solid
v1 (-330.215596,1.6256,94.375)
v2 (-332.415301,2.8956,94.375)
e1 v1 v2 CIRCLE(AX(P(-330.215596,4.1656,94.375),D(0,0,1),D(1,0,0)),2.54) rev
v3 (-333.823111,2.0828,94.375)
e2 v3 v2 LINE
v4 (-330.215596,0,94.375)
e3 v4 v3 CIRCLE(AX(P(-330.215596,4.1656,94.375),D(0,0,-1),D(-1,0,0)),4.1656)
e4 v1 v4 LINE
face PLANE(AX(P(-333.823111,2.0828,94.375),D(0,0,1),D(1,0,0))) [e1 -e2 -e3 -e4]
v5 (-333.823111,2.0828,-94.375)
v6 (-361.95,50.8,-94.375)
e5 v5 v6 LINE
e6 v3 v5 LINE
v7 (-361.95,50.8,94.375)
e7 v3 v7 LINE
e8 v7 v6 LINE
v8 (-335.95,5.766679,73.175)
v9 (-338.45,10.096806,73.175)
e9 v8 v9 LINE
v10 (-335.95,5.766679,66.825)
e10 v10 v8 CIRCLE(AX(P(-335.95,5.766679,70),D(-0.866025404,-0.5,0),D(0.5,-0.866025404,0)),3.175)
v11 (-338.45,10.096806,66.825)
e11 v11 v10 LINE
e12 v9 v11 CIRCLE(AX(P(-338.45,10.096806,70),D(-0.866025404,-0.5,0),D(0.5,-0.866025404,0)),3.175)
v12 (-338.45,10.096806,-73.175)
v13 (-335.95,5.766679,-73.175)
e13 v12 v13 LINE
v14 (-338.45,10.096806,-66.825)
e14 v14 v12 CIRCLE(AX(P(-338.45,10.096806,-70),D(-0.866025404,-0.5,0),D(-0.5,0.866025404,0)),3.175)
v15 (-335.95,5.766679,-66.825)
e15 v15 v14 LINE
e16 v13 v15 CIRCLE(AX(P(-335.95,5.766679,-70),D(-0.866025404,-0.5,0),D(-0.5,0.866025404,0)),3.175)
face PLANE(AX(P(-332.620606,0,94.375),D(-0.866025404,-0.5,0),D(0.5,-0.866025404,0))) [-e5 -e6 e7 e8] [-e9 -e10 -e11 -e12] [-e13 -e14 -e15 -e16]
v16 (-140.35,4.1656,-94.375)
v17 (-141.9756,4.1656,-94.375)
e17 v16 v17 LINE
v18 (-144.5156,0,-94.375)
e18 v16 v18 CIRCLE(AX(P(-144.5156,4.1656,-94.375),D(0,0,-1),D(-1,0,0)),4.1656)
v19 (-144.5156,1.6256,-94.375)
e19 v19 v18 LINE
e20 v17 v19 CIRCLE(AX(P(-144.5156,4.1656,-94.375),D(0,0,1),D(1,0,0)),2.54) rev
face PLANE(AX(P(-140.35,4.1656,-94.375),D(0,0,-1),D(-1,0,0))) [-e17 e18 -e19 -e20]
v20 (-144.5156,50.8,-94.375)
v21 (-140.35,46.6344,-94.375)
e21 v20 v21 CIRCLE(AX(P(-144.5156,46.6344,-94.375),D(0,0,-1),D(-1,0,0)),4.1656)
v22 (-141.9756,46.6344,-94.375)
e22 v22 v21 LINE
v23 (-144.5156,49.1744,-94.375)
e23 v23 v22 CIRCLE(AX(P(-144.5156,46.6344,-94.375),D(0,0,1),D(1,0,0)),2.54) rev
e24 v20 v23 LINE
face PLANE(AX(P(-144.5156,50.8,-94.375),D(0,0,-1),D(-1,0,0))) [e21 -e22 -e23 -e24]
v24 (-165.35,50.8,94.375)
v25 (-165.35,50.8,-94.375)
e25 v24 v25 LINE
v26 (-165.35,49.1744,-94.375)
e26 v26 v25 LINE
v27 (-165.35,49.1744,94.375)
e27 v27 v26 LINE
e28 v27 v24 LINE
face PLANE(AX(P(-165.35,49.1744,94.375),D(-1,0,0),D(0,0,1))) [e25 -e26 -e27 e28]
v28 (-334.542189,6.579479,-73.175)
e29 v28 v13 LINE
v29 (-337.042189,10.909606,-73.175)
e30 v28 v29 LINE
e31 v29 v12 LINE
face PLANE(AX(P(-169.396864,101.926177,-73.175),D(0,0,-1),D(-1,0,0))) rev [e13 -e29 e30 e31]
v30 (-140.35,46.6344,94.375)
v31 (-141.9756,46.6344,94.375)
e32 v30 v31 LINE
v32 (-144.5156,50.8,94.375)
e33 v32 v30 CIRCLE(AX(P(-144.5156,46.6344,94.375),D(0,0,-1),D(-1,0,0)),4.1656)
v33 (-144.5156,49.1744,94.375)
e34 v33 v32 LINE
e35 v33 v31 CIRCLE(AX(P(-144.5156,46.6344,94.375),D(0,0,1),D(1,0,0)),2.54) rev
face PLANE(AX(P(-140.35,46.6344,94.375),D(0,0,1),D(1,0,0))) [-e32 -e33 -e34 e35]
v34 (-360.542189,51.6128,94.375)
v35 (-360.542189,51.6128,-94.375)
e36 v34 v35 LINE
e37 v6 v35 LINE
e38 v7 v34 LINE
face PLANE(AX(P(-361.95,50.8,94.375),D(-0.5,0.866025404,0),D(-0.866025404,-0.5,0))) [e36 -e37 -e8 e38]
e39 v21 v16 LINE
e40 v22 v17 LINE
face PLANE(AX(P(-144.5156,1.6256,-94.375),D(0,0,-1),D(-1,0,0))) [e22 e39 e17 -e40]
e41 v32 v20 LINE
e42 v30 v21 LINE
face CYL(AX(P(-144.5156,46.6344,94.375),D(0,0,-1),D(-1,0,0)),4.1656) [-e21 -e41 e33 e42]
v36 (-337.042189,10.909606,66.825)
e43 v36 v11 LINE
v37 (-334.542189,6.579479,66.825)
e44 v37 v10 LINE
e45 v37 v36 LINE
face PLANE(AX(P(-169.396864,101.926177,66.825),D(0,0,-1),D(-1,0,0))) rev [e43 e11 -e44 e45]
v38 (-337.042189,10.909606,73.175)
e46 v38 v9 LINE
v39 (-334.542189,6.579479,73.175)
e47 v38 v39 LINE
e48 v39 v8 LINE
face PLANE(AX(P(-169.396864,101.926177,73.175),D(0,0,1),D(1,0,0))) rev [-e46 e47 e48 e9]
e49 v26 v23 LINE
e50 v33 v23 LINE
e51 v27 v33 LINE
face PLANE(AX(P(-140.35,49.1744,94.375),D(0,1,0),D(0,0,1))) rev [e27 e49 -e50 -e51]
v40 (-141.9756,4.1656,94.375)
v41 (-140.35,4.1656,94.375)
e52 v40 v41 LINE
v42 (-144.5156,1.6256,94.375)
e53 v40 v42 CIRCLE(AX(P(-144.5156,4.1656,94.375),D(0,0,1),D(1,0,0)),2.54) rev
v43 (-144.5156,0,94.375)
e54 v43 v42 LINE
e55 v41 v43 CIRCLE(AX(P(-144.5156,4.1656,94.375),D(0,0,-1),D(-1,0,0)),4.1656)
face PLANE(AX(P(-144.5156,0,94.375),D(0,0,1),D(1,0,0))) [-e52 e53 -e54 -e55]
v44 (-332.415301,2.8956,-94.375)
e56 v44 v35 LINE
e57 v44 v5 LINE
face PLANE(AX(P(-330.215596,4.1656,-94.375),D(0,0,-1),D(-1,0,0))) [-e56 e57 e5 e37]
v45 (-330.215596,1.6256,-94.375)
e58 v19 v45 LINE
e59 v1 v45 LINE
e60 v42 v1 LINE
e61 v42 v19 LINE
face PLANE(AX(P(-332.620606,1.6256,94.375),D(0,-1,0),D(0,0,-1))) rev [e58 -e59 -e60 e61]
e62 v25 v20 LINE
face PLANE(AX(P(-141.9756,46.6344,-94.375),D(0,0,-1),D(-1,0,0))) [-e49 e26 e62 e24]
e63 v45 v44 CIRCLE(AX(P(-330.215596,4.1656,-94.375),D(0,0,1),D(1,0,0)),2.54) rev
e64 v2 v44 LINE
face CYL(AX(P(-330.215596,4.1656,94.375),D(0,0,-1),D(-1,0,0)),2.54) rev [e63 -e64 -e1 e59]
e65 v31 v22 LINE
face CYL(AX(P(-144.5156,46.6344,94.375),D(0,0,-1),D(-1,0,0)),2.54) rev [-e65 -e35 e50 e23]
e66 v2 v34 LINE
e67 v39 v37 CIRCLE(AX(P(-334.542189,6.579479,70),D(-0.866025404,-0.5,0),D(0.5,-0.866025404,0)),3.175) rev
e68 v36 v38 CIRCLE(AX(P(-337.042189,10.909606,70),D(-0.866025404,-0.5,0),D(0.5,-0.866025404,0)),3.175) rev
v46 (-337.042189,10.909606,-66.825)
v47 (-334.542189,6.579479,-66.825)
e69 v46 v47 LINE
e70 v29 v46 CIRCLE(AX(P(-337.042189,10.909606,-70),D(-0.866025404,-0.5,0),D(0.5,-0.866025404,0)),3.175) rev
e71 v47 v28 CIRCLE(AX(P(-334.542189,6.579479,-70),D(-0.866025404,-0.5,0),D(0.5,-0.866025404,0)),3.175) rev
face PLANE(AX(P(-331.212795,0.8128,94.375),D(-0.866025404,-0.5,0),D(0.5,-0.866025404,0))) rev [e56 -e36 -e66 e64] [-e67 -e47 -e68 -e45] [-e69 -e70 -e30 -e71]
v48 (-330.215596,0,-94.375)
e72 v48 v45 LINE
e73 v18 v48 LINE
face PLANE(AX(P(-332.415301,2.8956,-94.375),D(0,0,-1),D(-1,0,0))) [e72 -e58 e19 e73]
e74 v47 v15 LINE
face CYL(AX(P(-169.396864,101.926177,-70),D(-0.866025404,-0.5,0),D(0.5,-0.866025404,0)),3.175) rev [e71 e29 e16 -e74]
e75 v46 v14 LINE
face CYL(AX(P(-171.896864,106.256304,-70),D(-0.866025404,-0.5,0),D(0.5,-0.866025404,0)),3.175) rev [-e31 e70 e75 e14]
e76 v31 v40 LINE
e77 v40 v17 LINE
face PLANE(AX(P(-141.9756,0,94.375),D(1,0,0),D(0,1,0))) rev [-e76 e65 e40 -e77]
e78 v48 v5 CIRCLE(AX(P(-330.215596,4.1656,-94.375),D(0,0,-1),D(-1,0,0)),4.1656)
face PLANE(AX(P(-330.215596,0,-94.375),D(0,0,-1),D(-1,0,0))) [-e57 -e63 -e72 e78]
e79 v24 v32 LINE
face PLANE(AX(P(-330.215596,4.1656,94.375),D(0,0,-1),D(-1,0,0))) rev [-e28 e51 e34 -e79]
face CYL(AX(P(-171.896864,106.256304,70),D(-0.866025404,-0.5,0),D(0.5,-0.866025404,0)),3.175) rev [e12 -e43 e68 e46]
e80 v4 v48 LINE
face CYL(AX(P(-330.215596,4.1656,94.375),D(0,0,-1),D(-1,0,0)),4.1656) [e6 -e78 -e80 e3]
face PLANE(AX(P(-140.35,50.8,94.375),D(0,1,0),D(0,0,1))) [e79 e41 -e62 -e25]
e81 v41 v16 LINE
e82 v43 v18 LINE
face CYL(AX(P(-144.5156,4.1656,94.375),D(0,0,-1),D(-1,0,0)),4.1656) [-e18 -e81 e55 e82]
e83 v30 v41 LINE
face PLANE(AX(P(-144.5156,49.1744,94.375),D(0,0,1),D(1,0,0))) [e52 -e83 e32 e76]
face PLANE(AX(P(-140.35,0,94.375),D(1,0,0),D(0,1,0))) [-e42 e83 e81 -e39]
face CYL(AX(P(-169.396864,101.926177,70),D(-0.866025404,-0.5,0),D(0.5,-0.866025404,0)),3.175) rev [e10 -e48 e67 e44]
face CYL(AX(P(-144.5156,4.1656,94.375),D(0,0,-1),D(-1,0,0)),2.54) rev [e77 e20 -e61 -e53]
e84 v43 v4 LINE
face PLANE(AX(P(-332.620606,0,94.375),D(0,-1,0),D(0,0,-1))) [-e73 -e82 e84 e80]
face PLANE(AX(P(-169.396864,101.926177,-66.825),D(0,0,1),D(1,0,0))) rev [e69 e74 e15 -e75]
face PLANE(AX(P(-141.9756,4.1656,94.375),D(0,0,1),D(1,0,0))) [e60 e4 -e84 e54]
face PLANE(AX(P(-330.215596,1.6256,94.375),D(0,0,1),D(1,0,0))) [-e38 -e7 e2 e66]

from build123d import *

# Parameters (mm, degrees)
BASE_FLANGE1_START = -94.375
BASE_FLANGE1_DEPTH = 188.75
CUT_EXTRUDE1_REACH = 246.612


# Read off the part's stored shape, not the designer's step: Base-Flange1
with BuildPart() as part:
    # Base-Flange1 outline → Base-Flange1 (new body)
    with BuildSketch(Plane.XY.offset(BASE_FLANGE1_START)):
        with BuildLine():
            Line((-332.415300569, 2.8956), (-360.542189104, 51.6128))
            Line((-360.542189104, 51.6128), (-361.95, 50.8))
            Line((-361.95, 50.8), (-333.823111466, 2.0828))
            ThreePointArc((-333.823111466, 2.0828), (-332.298396044, 0.558084578), (-330.215596044, 0))
            Line((-330.215596044, 0), (-144.5156, 0))
            ThreePointArc((-144.5156, 0), (-141.570075992, 1.220075992), (-140.35, 4.1656))
            Line((-140.35, 4.1656), (-140.35, 46.6344))
            ThreePointArc((-140.35, 46.6344), (-141.570075992, 49.579924008), (-144.5156, 50.8))
            Line((-144.5156, 50.8), (-165.35, 50.8))
            Line((-165.35, 50.8), (-165.35, 49.1744))
            Line((-165.35, 49.1744), (-144.5156, 49.1744))
            ThreePointArc((-144.5156, 49.1744), (-142.719548776, 48.430451224), (-141.9756, 46.6344))
            Line((-141.9756, 46.6344), (-141.9756, 4.1656))
            ThreePointArc((-141.9756, 4.1656), (-142.719548776, 2.369548776), (-144.5156, 1.6256))
            Line((-144.5156, 1.6256), (-330.215596044, 1.6256))
            ThreePointArc((-330.215596044, 1.6256), (-331.485596044, 1.965895474), (-332.415300569, 2.8956))
        make_face()
    extrude(amount=BASE_FLANGE1_DEPTH)

    # Sketch15 → Cut-Extrude1 (cut, up to next)
    with BuildSketch(Plane(origin=(-249.465454744, -144.02894745, 0), x_dir=(0, 0, 1), z_dir=(-0.8660254037844362, -0.5000000000000044, 0)), mode=Mode.PRIVATE) as cut_extrude1_sk1:
        with BuildLine():
            Line((66.825, 172.969090512), (66.825, 177.969090512))
            ThreePointArc((66.825, 177.969090512), (70, 181.144090512), (73.175, 177.969090512))
            Line((73.175, 177.969090512), (73.175, 172.969090512))
            ThreePointArc((73.175, 172.969090512), (70, 169.794090512), (66.825, 172.969090512))
        make_face()
    cut_extrude1_tool1 = extrude(cut_extrude1_sk1.sketch, amount=-CUT_EXTRUDE1_REACH, mode=Mode.PRIVATE) & part.part
    # Sketch15 → Cut-Extrude1 (cut, up to next)
    with BuildSketch(Plane(origin=(-249.465454744, -144.02894745, 0), x_dir=(0, 0, 1), z_dir=(-0.8660254037844362, -0.5000000000000044, 0)), mode=Mode.PRIVATE) as cut_extrude1_sk2:
        with BuildLine():
            Line((-66.825, 172.969090512), (-66.825, 177.969090512))
            ThreePointArc((-66.825, 177.969090512), (-70, 181.144090512), (-73.175, 177.969090512))
            Line((-73.175, 177.969090512), (-73.175, 172.969090512))
            ThreePointArc((-73.175, 172.969090512), (-70, 169.794090512), (-66.825, 172.969090512))
        make_face()
    cut_extrude1_tool2 = extrude(cut_extrude1_sk2.sketch, amount=-CUT_EXTRUDE1_REACH, mode=Mode.PRIVATE) & part.part
    add(cut_extrude1_tool1.solids().sort_by_distance((-337.2, 7.931743, 70))[0], mode=Mode.SUBTRACT)
    add(cut_extrude1_tool2.solids().sort_by_distance((-337.2, 7.931743, -70))[0], mode=Mode.SUBTRACT)


solid = part.part
